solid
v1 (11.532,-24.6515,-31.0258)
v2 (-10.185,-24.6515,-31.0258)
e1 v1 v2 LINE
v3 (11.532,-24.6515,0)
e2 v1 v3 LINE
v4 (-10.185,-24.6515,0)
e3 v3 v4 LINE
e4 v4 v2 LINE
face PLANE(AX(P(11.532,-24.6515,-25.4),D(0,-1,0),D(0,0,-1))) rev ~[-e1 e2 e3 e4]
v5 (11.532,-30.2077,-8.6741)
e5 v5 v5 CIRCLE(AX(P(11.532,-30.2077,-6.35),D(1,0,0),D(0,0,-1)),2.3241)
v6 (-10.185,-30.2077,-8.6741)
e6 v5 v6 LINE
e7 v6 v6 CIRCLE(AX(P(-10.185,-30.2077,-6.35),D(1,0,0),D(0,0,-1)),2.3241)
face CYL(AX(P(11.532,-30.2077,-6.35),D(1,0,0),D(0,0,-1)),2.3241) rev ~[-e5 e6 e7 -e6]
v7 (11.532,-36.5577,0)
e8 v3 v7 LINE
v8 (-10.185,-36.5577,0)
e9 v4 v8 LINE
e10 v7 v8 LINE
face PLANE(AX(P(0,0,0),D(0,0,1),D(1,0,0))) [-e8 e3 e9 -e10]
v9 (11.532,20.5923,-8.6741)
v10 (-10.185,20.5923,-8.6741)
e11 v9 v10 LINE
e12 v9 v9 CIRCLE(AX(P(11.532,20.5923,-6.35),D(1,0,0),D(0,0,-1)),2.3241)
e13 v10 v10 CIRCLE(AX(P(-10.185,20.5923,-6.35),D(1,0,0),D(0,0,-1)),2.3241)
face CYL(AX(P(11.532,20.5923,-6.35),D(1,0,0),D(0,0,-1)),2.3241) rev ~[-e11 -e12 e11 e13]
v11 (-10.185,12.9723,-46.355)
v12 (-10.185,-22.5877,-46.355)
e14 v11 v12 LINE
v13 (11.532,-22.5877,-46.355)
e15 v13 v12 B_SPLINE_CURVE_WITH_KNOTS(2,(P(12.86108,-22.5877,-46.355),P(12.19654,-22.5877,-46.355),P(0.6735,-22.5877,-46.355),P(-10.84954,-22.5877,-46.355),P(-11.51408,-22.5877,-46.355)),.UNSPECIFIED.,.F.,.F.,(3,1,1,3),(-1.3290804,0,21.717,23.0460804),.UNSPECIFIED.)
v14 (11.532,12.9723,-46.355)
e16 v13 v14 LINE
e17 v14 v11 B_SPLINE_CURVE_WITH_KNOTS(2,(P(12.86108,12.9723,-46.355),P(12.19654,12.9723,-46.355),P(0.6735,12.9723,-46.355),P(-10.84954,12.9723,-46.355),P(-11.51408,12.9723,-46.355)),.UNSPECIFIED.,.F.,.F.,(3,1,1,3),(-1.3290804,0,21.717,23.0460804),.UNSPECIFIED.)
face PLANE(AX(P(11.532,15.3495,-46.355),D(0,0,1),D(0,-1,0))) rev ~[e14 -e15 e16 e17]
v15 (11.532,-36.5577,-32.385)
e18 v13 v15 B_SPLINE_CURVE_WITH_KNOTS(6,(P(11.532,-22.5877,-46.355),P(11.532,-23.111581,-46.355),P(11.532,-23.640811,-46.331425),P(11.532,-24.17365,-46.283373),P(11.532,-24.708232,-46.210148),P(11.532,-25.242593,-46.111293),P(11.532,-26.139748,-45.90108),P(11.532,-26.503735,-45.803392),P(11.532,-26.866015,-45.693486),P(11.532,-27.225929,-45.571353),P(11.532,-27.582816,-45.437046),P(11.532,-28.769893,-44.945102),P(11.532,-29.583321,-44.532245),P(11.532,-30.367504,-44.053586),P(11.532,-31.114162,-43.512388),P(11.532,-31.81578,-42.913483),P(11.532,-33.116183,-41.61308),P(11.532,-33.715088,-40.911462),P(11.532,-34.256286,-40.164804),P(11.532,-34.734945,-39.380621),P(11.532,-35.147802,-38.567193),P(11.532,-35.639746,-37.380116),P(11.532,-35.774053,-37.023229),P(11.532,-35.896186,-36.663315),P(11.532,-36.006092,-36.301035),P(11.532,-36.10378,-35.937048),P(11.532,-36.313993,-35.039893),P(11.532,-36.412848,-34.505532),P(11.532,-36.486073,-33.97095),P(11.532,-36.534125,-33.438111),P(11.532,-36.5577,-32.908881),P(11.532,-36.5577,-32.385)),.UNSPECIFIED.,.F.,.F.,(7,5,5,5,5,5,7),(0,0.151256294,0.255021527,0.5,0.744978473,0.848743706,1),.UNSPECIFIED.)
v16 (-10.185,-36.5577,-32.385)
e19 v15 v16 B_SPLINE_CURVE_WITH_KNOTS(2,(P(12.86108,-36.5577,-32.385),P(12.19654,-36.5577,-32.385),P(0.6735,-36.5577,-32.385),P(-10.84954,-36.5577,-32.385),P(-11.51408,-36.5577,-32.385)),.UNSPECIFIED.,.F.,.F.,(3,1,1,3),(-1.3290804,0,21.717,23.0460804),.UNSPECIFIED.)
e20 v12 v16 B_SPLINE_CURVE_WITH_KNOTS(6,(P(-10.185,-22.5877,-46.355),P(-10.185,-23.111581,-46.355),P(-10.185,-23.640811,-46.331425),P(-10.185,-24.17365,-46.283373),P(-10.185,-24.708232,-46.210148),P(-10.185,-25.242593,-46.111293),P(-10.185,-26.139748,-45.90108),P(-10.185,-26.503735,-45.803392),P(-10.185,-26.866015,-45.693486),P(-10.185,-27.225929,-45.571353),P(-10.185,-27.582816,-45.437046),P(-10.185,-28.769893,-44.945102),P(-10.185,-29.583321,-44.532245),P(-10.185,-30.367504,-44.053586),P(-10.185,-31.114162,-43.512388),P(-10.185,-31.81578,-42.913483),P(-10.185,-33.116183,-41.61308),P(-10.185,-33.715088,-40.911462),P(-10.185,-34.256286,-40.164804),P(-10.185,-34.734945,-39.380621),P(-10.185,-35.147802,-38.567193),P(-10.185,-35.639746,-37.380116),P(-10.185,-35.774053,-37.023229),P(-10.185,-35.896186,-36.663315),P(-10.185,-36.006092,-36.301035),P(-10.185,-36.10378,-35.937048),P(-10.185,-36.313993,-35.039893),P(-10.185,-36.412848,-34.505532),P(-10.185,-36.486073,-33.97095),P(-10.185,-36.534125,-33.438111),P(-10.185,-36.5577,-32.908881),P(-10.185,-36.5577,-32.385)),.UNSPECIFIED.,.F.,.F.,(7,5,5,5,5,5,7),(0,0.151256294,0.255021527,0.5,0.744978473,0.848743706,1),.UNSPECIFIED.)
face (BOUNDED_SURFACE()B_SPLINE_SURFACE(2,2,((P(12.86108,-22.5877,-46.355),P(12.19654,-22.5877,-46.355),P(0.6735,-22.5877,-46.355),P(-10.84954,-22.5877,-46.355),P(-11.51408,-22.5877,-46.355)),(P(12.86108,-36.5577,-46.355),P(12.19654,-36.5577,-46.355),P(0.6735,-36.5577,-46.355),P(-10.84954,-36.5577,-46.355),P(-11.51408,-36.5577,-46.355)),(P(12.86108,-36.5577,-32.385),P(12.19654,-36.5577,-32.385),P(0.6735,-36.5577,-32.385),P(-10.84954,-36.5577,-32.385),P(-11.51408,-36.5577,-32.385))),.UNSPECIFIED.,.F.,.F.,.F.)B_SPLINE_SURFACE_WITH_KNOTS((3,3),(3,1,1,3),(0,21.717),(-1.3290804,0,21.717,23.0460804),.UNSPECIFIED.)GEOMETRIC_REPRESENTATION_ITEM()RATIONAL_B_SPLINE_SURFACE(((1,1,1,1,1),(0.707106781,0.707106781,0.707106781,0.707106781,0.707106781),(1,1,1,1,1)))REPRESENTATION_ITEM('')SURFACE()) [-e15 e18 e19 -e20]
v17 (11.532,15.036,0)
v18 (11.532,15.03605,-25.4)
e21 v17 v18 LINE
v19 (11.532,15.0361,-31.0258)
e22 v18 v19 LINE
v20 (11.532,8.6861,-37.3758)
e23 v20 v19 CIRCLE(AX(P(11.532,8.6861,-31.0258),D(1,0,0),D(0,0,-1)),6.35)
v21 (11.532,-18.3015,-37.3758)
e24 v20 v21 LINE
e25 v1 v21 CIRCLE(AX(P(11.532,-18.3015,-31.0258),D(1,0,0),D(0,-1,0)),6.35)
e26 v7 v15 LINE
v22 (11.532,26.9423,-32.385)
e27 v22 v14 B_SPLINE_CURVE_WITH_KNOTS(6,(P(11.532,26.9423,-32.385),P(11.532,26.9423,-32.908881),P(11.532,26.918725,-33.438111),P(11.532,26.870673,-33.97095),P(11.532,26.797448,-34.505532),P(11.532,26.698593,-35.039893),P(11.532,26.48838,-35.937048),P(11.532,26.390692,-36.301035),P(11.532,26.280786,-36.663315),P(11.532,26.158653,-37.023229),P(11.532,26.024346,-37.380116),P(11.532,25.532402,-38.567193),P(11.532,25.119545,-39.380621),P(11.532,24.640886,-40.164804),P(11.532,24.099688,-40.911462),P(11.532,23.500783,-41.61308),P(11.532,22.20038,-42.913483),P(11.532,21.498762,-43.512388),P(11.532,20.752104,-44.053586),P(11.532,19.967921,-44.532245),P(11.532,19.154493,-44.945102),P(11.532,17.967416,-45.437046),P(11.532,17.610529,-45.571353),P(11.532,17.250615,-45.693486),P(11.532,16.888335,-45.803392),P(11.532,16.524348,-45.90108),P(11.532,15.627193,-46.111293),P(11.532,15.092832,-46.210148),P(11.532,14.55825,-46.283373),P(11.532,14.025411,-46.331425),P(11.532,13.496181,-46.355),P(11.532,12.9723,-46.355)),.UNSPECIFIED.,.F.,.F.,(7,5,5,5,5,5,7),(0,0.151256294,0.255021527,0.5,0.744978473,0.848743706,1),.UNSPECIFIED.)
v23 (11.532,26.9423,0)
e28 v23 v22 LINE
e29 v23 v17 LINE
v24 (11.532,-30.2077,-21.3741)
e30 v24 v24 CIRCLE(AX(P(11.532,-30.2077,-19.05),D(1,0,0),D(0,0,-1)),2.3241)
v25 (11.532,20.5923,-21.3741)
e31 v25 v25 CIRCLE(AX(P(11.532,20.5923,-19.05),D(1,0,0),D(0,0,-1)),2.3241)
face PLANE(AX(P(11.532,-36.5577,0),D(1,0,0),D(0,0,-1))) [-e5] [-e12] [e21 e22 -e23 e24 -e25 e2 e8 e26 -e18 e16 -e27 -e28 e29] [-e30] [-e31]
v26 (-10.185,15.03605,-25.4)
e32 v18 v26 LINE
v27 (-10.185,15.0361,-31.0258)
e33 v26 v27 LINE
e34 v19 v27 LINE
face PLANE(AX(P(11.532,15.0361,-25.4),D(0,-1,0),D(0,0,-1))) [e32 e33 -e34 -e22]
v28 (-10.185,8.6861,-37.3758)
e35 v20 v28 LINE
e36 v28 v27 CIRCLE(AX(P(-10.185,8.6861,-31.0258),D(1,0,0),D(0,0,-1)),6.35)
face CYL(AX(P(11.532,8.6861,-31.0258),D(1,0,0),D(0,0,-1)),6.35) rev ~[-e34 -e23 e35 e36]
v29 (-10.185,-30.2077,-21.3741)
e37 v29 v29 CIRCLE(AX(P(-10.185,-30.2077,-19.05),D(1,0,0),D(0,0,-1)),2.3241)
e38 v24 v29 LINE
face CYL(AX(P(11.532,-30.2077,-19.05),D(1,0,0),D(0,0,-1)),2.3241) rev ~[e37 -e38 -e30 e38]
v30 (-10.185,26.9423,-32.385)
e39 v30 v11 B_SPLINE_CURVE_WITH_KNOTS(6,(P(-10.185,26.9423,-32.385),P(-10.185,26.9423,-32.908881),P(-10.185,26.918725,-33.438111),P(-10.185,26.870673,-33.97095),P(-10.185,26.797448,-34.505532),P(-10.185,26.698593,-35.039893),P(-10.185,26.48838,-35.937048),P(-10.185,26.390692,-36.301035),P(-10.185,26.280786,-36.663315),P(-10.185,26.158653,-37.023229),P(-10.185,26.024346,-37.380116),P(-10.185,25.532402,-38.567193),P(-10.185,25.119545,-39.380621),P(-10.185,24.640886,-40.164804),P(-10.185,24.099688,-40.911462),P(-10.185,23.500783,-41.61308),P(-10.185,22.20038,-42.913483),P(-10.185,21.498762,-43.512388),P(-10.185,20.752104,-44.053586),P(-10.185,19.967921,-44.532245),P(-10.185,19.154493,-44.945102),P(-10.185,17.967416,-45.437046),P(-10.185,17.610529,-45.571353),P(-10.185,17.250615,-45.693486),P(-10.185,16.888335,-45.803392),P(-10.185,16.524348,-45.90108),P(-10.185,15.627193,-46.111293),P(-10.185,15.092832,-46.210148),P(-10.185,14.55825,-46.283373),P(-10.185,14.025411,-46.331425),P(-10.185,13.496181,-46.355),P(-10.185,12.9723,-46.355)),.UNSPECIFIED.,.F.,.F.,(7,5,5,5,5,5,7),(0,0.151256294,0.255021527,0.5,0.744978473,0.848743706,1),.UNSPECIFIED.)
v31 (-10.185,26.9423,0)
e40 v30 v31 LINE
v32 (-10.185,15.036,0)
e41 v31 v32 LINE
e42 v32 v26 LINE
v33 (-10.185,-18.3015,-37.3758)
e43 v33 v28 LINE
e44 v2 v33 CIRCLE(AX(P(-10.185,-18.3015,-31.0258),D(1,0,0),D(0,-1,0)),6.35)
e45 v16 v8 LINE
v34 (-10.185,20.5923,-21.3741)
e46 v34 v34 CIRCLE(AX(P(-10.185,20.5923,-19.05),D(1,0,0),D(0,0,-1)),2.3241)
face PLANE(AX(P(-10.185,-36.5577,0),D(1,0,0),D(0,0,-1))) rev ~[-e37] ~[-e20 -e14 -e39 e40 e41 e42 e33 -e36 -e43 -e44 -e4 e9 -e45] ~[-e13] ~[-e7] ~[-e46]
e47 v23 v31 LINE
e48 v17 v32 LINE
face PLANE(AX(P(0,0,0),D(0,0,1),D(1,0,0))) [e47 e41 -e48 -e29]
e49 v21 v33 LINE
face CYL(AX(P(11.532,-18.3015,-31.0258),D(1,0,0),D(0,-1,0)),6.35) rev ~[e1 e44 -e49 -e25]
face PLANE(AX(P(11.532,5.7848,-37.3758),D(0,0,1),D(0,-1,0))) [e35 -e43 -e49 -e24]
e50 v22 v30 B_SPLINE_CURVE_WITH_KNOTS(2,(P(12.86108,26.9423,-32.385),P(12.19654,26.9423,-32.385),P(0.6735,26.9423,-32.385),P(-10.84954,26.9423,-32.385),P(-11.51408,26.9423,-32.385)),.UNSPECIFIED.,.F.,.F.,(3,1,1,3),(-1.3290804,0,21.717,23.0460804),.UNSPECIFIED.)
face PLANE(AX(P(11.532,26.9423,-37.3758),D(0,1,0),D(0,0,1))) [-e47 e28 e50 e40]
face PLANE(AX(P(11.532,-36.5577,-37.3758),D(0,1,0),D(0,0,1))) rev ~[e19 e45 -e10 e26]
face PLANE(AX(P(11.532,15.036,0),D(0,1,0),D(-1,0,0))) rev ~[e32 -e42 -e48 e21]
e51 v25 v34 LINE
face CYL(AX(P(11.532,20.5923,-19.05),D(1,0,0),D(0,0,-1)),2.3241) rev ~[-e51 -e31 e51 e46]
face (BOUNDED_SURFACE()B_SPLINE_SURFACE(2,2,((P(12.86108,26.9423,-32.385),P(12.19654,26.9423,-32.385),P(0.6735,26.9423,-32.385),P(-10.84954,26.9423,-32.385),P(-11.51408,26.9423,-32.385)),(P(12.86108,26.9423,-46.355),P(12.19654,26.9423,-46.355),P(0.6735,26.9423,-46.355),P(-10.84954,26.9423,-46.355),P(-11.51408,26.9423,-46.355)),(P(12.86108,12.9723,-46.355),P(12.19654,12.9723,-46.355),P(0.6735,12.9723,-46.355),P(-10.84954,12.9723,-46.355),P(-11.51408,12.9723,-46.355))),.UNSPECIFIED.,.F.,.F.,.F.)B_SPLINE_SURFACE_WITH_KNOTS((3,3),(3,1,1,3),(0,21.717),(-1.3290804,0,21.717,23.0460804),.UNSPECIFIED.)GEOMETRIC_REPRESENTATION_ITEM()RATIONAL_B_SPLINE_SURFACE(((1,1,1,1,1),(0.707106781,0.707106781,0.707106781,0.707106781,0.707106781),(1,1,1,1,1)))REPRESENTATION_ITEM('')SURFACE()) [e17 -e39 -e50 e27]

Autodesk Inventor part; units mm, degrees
ref_plane "YZ Plane" through (0, 0, 0) normal (1, 0, 0) x (0, 1, 0)
ref_plane "XZ Plane" through (0, 0, 0) normal (0, 1, 0) x (-1, 0, 0)
ref_plane "XY Plane" through (0, 0, 0) normal (0, 0, 1) x (1, 0, 0)
sketch "Sketch4" plane through (0, 0, 0) normal (0, 0, 1) x (1, 0, 0)
  line L0 (10.9923, 14.2423) -> (-9.6452, 14.2423)
  line L1 (11.786, 15.036) -> (11.786, 25.9263)
  line L2 (13.3735, 26.9423) -> (11.786, 26.9423)
  line L3 (-10.439, 15.036) -> (-10.439, 25.9263)
  line L4 (-10.439, 26.9423) -> (-12.0265, 26.9423)
  arc A0 (-10.439, 15.036) -> (-9.6452, 14.2423) centre (-9.6452, 15.036) ccw
  arc A1 (10.9923, 14.2423) -> (11.786, 15.036) centre (10.9923, 15.036) ccw
  arc A2 (11.786, -24.6515) -> (10.9923, -23.8577) centre (10.9923, -24.6515) ccw
  line L5 (-9.6452, -23.8577) -> (10.9923, -23.8577)
  arc A3 (-9.6452, -23.8577) -> (-10.439, -24.6515) centre (-9.6452, -24.6515) ccw
  line L6 (-10.439, -24.6515) -> (-10.439, -36.5577)
  line L7 (11.786, -24.6515) -> (11.786, -36.5577)
  line L8 (11.786, 26.9423) -> (11.786, 25.9263)
  line L9 (-10.439, 26.9423) -> (-10.439, 25.9263)
  line L10 (11.786, -24.6515) -> (-10.439, -24.6515)
  line L11 (11.786, 15.036) -> (-10.439, 15.036)
  line L12 (11.786, 26.9423) -> (11.532, 26.9423)
  line L13 (11.532, 26.9423) -> (11.532, 15.036)
  line L14 (-10.439, 26.9423) -> (-10.185, 26.9423)
  line L15 (-10.185, 26.9423) -> (-10.185, 15.036)
  line L16 (11.532, 26.9423) -> (-10.185, 26.9423)
  line L17 (11.786, -24.6515) -> (11.532, -24.6515)
  line L18 (11.532, -24.6515) -> (11.532, -36.5577)
  line L19 (11.532, -36.5577) -> (11.786, -36.5577)
  line L20 (11.786, -36.5577) -> (11.786, -24.6515)
  line L21 (-10.439, -24.6515) -> (-10.185, -24.6515)
  line L22 (-10.185, -24.6515) -> (-10.185, -36.5577)
  line L23 (-10.185, -36.5577) -> (-10.439, -36.5577)
  line L24 (-10.439, -36.5577) -> (-10.439, -24.6515)
  line L25 (11.532, -36.5577) -> (-10.439, -36.5577)
  line L26 (0, 14.2423) -> (0, -23.8577)
  point P0 (0, 0)
  dimension "d5" = 22.225
  dimension "d6" = 0.254
  dimension "d7" = 0.254
  dimension "d14" = 38.1
extrude "Extrusion2" add sketch "Sketch4" against normal blind 25.4 contours L11 L15 L16 L13 | L18 L25 L22 L10
sketch "Sketch5" plane through (11.532, -36.5577, 0) normal (1, 0, 0) x (0, 0, -1)
  point P0 (0, 36.5577)
sketch "Sketch6" plane through (11.532, -36.5577, 0) normal (1, 0, 0) x (0, 0, -1)
  line L0 (0, 51.5938) -> (0, 63.5) projected
  line L1 (0, 51.5938) -> (25.4, 51.5938) projected
  line L2 (25.4, 63.5) -> (25.4, 51.5938) projected
  line L3 (0, 63.5) -> (25.4, 63.5) projected
  line L4 (0, 0) -> (0, 11.9062) projected
  line L5 (0, 0) -> (25.4, 0) projected
  line L6 (25.4, 11.9062) -> (25.4, 0) projected
  line L7 (0, 11.9062) -> (25.4, 11.9062) projected
  line L8 (25.4, 63.5) -> (25.4, 57.15)
  line L9 (25.4, 57.15) -> (19.05, 57.15)
  line L10 (25.4, 0) -> (25.4, 6.35)
  line L11 (25.4, 6.35) -> (19.05, 6.35)
  line L12 (25.4, 62.484) -> (25.4, 51.5938)
  line L13 (37.3758, 42.3425) -> (37.3758, 45.2438)
  line L14 (37.3758, 63.5) -> (25.4, 63.5)
  line L15 (37.3758, 0) -> (25.4, 0)
  line L16 (25.4, 63.5) -> (37.3758, 63.5)
  line L17 (46.355, 51.9072) -> (46.355, 11.5928)
  line L18 (37.3758, 0) -> (25.4, 0)
  line L19 (25.4, 51.5938) -> (31.0258, 51.5938)
  line L20 (25.4, 11.9062) -> (31.0258, 11.9062)
  arc A0 (37.3758, 45.2438) -> (31.0258, 51.5938) centre (31.0258, 45.2438) ccw
  line L21 (46.355, 51.9072) -> (46.355, 50.8)
  arc A1 (46.355, 50.8) -> (37.3758, 63.5) centre (33.6671, 51.3536) ccw
  arc A2 (31.0258, 11.9062) -> (37.3758, 18.2562) centre (31.0258, 18.2562) ccw
  line L22 (46.355, 11.5928) -> (46.355, 12.7)
  arc A3 (37.3758, 0) -> (46.355, 12.7) centre (33.6671, 12.1464) ccw
  line L23 (37.3758, 42.3425) -> (37.3758, 18.2562)
  line L24 (25.4, 6.35) -> (19.05, 6.35)
  circle A4 centre (19.05, 57.15) radius 2.3241
  circle A5 centre (6.35, 57.15) radius 2.3241
  line L25 (25.4, 6.35) -> (19.05, 6.35)
  circle A6 centre (19.05, 6.35) radius 2.3241
  line L26 (19.05, 6.35) -> (6.35, 6.35)
  circle A7 centre (6.35, 6.35) radius 2.3241
  point P0 (0, 36.5577)
  dimension "d15" = 6.35
  dimension "d16" = 6.35
  dimension "d17" = 6.35
  dimension "d35" = 4.6482
  dimension "d36" = 4.6482
  dimension "d37" = 12.7
  dimension "d38" = 4.6482
extrude "Extrusion3" add sketch "Sketch6" against normal up to surface (21.717 mm away) contours L2 L14 A1 L17 A3 L15 L6 L20 A2 L23 L13 A0 L19
extrude "Extrusion4" cut sketch "Sketch6" along normal through all both and the other way through all contours A6 L26 L11 | L11 L26 A6 | A4 | A5 | A7
fillet "Fillet1" radius 13.97 2 edges at (0.6735, 26.9423, -37.3758) (0.6735, -36.5577, -37.3758)
fillet_without_effect "Fillet2"
properties part number "Front_support"
